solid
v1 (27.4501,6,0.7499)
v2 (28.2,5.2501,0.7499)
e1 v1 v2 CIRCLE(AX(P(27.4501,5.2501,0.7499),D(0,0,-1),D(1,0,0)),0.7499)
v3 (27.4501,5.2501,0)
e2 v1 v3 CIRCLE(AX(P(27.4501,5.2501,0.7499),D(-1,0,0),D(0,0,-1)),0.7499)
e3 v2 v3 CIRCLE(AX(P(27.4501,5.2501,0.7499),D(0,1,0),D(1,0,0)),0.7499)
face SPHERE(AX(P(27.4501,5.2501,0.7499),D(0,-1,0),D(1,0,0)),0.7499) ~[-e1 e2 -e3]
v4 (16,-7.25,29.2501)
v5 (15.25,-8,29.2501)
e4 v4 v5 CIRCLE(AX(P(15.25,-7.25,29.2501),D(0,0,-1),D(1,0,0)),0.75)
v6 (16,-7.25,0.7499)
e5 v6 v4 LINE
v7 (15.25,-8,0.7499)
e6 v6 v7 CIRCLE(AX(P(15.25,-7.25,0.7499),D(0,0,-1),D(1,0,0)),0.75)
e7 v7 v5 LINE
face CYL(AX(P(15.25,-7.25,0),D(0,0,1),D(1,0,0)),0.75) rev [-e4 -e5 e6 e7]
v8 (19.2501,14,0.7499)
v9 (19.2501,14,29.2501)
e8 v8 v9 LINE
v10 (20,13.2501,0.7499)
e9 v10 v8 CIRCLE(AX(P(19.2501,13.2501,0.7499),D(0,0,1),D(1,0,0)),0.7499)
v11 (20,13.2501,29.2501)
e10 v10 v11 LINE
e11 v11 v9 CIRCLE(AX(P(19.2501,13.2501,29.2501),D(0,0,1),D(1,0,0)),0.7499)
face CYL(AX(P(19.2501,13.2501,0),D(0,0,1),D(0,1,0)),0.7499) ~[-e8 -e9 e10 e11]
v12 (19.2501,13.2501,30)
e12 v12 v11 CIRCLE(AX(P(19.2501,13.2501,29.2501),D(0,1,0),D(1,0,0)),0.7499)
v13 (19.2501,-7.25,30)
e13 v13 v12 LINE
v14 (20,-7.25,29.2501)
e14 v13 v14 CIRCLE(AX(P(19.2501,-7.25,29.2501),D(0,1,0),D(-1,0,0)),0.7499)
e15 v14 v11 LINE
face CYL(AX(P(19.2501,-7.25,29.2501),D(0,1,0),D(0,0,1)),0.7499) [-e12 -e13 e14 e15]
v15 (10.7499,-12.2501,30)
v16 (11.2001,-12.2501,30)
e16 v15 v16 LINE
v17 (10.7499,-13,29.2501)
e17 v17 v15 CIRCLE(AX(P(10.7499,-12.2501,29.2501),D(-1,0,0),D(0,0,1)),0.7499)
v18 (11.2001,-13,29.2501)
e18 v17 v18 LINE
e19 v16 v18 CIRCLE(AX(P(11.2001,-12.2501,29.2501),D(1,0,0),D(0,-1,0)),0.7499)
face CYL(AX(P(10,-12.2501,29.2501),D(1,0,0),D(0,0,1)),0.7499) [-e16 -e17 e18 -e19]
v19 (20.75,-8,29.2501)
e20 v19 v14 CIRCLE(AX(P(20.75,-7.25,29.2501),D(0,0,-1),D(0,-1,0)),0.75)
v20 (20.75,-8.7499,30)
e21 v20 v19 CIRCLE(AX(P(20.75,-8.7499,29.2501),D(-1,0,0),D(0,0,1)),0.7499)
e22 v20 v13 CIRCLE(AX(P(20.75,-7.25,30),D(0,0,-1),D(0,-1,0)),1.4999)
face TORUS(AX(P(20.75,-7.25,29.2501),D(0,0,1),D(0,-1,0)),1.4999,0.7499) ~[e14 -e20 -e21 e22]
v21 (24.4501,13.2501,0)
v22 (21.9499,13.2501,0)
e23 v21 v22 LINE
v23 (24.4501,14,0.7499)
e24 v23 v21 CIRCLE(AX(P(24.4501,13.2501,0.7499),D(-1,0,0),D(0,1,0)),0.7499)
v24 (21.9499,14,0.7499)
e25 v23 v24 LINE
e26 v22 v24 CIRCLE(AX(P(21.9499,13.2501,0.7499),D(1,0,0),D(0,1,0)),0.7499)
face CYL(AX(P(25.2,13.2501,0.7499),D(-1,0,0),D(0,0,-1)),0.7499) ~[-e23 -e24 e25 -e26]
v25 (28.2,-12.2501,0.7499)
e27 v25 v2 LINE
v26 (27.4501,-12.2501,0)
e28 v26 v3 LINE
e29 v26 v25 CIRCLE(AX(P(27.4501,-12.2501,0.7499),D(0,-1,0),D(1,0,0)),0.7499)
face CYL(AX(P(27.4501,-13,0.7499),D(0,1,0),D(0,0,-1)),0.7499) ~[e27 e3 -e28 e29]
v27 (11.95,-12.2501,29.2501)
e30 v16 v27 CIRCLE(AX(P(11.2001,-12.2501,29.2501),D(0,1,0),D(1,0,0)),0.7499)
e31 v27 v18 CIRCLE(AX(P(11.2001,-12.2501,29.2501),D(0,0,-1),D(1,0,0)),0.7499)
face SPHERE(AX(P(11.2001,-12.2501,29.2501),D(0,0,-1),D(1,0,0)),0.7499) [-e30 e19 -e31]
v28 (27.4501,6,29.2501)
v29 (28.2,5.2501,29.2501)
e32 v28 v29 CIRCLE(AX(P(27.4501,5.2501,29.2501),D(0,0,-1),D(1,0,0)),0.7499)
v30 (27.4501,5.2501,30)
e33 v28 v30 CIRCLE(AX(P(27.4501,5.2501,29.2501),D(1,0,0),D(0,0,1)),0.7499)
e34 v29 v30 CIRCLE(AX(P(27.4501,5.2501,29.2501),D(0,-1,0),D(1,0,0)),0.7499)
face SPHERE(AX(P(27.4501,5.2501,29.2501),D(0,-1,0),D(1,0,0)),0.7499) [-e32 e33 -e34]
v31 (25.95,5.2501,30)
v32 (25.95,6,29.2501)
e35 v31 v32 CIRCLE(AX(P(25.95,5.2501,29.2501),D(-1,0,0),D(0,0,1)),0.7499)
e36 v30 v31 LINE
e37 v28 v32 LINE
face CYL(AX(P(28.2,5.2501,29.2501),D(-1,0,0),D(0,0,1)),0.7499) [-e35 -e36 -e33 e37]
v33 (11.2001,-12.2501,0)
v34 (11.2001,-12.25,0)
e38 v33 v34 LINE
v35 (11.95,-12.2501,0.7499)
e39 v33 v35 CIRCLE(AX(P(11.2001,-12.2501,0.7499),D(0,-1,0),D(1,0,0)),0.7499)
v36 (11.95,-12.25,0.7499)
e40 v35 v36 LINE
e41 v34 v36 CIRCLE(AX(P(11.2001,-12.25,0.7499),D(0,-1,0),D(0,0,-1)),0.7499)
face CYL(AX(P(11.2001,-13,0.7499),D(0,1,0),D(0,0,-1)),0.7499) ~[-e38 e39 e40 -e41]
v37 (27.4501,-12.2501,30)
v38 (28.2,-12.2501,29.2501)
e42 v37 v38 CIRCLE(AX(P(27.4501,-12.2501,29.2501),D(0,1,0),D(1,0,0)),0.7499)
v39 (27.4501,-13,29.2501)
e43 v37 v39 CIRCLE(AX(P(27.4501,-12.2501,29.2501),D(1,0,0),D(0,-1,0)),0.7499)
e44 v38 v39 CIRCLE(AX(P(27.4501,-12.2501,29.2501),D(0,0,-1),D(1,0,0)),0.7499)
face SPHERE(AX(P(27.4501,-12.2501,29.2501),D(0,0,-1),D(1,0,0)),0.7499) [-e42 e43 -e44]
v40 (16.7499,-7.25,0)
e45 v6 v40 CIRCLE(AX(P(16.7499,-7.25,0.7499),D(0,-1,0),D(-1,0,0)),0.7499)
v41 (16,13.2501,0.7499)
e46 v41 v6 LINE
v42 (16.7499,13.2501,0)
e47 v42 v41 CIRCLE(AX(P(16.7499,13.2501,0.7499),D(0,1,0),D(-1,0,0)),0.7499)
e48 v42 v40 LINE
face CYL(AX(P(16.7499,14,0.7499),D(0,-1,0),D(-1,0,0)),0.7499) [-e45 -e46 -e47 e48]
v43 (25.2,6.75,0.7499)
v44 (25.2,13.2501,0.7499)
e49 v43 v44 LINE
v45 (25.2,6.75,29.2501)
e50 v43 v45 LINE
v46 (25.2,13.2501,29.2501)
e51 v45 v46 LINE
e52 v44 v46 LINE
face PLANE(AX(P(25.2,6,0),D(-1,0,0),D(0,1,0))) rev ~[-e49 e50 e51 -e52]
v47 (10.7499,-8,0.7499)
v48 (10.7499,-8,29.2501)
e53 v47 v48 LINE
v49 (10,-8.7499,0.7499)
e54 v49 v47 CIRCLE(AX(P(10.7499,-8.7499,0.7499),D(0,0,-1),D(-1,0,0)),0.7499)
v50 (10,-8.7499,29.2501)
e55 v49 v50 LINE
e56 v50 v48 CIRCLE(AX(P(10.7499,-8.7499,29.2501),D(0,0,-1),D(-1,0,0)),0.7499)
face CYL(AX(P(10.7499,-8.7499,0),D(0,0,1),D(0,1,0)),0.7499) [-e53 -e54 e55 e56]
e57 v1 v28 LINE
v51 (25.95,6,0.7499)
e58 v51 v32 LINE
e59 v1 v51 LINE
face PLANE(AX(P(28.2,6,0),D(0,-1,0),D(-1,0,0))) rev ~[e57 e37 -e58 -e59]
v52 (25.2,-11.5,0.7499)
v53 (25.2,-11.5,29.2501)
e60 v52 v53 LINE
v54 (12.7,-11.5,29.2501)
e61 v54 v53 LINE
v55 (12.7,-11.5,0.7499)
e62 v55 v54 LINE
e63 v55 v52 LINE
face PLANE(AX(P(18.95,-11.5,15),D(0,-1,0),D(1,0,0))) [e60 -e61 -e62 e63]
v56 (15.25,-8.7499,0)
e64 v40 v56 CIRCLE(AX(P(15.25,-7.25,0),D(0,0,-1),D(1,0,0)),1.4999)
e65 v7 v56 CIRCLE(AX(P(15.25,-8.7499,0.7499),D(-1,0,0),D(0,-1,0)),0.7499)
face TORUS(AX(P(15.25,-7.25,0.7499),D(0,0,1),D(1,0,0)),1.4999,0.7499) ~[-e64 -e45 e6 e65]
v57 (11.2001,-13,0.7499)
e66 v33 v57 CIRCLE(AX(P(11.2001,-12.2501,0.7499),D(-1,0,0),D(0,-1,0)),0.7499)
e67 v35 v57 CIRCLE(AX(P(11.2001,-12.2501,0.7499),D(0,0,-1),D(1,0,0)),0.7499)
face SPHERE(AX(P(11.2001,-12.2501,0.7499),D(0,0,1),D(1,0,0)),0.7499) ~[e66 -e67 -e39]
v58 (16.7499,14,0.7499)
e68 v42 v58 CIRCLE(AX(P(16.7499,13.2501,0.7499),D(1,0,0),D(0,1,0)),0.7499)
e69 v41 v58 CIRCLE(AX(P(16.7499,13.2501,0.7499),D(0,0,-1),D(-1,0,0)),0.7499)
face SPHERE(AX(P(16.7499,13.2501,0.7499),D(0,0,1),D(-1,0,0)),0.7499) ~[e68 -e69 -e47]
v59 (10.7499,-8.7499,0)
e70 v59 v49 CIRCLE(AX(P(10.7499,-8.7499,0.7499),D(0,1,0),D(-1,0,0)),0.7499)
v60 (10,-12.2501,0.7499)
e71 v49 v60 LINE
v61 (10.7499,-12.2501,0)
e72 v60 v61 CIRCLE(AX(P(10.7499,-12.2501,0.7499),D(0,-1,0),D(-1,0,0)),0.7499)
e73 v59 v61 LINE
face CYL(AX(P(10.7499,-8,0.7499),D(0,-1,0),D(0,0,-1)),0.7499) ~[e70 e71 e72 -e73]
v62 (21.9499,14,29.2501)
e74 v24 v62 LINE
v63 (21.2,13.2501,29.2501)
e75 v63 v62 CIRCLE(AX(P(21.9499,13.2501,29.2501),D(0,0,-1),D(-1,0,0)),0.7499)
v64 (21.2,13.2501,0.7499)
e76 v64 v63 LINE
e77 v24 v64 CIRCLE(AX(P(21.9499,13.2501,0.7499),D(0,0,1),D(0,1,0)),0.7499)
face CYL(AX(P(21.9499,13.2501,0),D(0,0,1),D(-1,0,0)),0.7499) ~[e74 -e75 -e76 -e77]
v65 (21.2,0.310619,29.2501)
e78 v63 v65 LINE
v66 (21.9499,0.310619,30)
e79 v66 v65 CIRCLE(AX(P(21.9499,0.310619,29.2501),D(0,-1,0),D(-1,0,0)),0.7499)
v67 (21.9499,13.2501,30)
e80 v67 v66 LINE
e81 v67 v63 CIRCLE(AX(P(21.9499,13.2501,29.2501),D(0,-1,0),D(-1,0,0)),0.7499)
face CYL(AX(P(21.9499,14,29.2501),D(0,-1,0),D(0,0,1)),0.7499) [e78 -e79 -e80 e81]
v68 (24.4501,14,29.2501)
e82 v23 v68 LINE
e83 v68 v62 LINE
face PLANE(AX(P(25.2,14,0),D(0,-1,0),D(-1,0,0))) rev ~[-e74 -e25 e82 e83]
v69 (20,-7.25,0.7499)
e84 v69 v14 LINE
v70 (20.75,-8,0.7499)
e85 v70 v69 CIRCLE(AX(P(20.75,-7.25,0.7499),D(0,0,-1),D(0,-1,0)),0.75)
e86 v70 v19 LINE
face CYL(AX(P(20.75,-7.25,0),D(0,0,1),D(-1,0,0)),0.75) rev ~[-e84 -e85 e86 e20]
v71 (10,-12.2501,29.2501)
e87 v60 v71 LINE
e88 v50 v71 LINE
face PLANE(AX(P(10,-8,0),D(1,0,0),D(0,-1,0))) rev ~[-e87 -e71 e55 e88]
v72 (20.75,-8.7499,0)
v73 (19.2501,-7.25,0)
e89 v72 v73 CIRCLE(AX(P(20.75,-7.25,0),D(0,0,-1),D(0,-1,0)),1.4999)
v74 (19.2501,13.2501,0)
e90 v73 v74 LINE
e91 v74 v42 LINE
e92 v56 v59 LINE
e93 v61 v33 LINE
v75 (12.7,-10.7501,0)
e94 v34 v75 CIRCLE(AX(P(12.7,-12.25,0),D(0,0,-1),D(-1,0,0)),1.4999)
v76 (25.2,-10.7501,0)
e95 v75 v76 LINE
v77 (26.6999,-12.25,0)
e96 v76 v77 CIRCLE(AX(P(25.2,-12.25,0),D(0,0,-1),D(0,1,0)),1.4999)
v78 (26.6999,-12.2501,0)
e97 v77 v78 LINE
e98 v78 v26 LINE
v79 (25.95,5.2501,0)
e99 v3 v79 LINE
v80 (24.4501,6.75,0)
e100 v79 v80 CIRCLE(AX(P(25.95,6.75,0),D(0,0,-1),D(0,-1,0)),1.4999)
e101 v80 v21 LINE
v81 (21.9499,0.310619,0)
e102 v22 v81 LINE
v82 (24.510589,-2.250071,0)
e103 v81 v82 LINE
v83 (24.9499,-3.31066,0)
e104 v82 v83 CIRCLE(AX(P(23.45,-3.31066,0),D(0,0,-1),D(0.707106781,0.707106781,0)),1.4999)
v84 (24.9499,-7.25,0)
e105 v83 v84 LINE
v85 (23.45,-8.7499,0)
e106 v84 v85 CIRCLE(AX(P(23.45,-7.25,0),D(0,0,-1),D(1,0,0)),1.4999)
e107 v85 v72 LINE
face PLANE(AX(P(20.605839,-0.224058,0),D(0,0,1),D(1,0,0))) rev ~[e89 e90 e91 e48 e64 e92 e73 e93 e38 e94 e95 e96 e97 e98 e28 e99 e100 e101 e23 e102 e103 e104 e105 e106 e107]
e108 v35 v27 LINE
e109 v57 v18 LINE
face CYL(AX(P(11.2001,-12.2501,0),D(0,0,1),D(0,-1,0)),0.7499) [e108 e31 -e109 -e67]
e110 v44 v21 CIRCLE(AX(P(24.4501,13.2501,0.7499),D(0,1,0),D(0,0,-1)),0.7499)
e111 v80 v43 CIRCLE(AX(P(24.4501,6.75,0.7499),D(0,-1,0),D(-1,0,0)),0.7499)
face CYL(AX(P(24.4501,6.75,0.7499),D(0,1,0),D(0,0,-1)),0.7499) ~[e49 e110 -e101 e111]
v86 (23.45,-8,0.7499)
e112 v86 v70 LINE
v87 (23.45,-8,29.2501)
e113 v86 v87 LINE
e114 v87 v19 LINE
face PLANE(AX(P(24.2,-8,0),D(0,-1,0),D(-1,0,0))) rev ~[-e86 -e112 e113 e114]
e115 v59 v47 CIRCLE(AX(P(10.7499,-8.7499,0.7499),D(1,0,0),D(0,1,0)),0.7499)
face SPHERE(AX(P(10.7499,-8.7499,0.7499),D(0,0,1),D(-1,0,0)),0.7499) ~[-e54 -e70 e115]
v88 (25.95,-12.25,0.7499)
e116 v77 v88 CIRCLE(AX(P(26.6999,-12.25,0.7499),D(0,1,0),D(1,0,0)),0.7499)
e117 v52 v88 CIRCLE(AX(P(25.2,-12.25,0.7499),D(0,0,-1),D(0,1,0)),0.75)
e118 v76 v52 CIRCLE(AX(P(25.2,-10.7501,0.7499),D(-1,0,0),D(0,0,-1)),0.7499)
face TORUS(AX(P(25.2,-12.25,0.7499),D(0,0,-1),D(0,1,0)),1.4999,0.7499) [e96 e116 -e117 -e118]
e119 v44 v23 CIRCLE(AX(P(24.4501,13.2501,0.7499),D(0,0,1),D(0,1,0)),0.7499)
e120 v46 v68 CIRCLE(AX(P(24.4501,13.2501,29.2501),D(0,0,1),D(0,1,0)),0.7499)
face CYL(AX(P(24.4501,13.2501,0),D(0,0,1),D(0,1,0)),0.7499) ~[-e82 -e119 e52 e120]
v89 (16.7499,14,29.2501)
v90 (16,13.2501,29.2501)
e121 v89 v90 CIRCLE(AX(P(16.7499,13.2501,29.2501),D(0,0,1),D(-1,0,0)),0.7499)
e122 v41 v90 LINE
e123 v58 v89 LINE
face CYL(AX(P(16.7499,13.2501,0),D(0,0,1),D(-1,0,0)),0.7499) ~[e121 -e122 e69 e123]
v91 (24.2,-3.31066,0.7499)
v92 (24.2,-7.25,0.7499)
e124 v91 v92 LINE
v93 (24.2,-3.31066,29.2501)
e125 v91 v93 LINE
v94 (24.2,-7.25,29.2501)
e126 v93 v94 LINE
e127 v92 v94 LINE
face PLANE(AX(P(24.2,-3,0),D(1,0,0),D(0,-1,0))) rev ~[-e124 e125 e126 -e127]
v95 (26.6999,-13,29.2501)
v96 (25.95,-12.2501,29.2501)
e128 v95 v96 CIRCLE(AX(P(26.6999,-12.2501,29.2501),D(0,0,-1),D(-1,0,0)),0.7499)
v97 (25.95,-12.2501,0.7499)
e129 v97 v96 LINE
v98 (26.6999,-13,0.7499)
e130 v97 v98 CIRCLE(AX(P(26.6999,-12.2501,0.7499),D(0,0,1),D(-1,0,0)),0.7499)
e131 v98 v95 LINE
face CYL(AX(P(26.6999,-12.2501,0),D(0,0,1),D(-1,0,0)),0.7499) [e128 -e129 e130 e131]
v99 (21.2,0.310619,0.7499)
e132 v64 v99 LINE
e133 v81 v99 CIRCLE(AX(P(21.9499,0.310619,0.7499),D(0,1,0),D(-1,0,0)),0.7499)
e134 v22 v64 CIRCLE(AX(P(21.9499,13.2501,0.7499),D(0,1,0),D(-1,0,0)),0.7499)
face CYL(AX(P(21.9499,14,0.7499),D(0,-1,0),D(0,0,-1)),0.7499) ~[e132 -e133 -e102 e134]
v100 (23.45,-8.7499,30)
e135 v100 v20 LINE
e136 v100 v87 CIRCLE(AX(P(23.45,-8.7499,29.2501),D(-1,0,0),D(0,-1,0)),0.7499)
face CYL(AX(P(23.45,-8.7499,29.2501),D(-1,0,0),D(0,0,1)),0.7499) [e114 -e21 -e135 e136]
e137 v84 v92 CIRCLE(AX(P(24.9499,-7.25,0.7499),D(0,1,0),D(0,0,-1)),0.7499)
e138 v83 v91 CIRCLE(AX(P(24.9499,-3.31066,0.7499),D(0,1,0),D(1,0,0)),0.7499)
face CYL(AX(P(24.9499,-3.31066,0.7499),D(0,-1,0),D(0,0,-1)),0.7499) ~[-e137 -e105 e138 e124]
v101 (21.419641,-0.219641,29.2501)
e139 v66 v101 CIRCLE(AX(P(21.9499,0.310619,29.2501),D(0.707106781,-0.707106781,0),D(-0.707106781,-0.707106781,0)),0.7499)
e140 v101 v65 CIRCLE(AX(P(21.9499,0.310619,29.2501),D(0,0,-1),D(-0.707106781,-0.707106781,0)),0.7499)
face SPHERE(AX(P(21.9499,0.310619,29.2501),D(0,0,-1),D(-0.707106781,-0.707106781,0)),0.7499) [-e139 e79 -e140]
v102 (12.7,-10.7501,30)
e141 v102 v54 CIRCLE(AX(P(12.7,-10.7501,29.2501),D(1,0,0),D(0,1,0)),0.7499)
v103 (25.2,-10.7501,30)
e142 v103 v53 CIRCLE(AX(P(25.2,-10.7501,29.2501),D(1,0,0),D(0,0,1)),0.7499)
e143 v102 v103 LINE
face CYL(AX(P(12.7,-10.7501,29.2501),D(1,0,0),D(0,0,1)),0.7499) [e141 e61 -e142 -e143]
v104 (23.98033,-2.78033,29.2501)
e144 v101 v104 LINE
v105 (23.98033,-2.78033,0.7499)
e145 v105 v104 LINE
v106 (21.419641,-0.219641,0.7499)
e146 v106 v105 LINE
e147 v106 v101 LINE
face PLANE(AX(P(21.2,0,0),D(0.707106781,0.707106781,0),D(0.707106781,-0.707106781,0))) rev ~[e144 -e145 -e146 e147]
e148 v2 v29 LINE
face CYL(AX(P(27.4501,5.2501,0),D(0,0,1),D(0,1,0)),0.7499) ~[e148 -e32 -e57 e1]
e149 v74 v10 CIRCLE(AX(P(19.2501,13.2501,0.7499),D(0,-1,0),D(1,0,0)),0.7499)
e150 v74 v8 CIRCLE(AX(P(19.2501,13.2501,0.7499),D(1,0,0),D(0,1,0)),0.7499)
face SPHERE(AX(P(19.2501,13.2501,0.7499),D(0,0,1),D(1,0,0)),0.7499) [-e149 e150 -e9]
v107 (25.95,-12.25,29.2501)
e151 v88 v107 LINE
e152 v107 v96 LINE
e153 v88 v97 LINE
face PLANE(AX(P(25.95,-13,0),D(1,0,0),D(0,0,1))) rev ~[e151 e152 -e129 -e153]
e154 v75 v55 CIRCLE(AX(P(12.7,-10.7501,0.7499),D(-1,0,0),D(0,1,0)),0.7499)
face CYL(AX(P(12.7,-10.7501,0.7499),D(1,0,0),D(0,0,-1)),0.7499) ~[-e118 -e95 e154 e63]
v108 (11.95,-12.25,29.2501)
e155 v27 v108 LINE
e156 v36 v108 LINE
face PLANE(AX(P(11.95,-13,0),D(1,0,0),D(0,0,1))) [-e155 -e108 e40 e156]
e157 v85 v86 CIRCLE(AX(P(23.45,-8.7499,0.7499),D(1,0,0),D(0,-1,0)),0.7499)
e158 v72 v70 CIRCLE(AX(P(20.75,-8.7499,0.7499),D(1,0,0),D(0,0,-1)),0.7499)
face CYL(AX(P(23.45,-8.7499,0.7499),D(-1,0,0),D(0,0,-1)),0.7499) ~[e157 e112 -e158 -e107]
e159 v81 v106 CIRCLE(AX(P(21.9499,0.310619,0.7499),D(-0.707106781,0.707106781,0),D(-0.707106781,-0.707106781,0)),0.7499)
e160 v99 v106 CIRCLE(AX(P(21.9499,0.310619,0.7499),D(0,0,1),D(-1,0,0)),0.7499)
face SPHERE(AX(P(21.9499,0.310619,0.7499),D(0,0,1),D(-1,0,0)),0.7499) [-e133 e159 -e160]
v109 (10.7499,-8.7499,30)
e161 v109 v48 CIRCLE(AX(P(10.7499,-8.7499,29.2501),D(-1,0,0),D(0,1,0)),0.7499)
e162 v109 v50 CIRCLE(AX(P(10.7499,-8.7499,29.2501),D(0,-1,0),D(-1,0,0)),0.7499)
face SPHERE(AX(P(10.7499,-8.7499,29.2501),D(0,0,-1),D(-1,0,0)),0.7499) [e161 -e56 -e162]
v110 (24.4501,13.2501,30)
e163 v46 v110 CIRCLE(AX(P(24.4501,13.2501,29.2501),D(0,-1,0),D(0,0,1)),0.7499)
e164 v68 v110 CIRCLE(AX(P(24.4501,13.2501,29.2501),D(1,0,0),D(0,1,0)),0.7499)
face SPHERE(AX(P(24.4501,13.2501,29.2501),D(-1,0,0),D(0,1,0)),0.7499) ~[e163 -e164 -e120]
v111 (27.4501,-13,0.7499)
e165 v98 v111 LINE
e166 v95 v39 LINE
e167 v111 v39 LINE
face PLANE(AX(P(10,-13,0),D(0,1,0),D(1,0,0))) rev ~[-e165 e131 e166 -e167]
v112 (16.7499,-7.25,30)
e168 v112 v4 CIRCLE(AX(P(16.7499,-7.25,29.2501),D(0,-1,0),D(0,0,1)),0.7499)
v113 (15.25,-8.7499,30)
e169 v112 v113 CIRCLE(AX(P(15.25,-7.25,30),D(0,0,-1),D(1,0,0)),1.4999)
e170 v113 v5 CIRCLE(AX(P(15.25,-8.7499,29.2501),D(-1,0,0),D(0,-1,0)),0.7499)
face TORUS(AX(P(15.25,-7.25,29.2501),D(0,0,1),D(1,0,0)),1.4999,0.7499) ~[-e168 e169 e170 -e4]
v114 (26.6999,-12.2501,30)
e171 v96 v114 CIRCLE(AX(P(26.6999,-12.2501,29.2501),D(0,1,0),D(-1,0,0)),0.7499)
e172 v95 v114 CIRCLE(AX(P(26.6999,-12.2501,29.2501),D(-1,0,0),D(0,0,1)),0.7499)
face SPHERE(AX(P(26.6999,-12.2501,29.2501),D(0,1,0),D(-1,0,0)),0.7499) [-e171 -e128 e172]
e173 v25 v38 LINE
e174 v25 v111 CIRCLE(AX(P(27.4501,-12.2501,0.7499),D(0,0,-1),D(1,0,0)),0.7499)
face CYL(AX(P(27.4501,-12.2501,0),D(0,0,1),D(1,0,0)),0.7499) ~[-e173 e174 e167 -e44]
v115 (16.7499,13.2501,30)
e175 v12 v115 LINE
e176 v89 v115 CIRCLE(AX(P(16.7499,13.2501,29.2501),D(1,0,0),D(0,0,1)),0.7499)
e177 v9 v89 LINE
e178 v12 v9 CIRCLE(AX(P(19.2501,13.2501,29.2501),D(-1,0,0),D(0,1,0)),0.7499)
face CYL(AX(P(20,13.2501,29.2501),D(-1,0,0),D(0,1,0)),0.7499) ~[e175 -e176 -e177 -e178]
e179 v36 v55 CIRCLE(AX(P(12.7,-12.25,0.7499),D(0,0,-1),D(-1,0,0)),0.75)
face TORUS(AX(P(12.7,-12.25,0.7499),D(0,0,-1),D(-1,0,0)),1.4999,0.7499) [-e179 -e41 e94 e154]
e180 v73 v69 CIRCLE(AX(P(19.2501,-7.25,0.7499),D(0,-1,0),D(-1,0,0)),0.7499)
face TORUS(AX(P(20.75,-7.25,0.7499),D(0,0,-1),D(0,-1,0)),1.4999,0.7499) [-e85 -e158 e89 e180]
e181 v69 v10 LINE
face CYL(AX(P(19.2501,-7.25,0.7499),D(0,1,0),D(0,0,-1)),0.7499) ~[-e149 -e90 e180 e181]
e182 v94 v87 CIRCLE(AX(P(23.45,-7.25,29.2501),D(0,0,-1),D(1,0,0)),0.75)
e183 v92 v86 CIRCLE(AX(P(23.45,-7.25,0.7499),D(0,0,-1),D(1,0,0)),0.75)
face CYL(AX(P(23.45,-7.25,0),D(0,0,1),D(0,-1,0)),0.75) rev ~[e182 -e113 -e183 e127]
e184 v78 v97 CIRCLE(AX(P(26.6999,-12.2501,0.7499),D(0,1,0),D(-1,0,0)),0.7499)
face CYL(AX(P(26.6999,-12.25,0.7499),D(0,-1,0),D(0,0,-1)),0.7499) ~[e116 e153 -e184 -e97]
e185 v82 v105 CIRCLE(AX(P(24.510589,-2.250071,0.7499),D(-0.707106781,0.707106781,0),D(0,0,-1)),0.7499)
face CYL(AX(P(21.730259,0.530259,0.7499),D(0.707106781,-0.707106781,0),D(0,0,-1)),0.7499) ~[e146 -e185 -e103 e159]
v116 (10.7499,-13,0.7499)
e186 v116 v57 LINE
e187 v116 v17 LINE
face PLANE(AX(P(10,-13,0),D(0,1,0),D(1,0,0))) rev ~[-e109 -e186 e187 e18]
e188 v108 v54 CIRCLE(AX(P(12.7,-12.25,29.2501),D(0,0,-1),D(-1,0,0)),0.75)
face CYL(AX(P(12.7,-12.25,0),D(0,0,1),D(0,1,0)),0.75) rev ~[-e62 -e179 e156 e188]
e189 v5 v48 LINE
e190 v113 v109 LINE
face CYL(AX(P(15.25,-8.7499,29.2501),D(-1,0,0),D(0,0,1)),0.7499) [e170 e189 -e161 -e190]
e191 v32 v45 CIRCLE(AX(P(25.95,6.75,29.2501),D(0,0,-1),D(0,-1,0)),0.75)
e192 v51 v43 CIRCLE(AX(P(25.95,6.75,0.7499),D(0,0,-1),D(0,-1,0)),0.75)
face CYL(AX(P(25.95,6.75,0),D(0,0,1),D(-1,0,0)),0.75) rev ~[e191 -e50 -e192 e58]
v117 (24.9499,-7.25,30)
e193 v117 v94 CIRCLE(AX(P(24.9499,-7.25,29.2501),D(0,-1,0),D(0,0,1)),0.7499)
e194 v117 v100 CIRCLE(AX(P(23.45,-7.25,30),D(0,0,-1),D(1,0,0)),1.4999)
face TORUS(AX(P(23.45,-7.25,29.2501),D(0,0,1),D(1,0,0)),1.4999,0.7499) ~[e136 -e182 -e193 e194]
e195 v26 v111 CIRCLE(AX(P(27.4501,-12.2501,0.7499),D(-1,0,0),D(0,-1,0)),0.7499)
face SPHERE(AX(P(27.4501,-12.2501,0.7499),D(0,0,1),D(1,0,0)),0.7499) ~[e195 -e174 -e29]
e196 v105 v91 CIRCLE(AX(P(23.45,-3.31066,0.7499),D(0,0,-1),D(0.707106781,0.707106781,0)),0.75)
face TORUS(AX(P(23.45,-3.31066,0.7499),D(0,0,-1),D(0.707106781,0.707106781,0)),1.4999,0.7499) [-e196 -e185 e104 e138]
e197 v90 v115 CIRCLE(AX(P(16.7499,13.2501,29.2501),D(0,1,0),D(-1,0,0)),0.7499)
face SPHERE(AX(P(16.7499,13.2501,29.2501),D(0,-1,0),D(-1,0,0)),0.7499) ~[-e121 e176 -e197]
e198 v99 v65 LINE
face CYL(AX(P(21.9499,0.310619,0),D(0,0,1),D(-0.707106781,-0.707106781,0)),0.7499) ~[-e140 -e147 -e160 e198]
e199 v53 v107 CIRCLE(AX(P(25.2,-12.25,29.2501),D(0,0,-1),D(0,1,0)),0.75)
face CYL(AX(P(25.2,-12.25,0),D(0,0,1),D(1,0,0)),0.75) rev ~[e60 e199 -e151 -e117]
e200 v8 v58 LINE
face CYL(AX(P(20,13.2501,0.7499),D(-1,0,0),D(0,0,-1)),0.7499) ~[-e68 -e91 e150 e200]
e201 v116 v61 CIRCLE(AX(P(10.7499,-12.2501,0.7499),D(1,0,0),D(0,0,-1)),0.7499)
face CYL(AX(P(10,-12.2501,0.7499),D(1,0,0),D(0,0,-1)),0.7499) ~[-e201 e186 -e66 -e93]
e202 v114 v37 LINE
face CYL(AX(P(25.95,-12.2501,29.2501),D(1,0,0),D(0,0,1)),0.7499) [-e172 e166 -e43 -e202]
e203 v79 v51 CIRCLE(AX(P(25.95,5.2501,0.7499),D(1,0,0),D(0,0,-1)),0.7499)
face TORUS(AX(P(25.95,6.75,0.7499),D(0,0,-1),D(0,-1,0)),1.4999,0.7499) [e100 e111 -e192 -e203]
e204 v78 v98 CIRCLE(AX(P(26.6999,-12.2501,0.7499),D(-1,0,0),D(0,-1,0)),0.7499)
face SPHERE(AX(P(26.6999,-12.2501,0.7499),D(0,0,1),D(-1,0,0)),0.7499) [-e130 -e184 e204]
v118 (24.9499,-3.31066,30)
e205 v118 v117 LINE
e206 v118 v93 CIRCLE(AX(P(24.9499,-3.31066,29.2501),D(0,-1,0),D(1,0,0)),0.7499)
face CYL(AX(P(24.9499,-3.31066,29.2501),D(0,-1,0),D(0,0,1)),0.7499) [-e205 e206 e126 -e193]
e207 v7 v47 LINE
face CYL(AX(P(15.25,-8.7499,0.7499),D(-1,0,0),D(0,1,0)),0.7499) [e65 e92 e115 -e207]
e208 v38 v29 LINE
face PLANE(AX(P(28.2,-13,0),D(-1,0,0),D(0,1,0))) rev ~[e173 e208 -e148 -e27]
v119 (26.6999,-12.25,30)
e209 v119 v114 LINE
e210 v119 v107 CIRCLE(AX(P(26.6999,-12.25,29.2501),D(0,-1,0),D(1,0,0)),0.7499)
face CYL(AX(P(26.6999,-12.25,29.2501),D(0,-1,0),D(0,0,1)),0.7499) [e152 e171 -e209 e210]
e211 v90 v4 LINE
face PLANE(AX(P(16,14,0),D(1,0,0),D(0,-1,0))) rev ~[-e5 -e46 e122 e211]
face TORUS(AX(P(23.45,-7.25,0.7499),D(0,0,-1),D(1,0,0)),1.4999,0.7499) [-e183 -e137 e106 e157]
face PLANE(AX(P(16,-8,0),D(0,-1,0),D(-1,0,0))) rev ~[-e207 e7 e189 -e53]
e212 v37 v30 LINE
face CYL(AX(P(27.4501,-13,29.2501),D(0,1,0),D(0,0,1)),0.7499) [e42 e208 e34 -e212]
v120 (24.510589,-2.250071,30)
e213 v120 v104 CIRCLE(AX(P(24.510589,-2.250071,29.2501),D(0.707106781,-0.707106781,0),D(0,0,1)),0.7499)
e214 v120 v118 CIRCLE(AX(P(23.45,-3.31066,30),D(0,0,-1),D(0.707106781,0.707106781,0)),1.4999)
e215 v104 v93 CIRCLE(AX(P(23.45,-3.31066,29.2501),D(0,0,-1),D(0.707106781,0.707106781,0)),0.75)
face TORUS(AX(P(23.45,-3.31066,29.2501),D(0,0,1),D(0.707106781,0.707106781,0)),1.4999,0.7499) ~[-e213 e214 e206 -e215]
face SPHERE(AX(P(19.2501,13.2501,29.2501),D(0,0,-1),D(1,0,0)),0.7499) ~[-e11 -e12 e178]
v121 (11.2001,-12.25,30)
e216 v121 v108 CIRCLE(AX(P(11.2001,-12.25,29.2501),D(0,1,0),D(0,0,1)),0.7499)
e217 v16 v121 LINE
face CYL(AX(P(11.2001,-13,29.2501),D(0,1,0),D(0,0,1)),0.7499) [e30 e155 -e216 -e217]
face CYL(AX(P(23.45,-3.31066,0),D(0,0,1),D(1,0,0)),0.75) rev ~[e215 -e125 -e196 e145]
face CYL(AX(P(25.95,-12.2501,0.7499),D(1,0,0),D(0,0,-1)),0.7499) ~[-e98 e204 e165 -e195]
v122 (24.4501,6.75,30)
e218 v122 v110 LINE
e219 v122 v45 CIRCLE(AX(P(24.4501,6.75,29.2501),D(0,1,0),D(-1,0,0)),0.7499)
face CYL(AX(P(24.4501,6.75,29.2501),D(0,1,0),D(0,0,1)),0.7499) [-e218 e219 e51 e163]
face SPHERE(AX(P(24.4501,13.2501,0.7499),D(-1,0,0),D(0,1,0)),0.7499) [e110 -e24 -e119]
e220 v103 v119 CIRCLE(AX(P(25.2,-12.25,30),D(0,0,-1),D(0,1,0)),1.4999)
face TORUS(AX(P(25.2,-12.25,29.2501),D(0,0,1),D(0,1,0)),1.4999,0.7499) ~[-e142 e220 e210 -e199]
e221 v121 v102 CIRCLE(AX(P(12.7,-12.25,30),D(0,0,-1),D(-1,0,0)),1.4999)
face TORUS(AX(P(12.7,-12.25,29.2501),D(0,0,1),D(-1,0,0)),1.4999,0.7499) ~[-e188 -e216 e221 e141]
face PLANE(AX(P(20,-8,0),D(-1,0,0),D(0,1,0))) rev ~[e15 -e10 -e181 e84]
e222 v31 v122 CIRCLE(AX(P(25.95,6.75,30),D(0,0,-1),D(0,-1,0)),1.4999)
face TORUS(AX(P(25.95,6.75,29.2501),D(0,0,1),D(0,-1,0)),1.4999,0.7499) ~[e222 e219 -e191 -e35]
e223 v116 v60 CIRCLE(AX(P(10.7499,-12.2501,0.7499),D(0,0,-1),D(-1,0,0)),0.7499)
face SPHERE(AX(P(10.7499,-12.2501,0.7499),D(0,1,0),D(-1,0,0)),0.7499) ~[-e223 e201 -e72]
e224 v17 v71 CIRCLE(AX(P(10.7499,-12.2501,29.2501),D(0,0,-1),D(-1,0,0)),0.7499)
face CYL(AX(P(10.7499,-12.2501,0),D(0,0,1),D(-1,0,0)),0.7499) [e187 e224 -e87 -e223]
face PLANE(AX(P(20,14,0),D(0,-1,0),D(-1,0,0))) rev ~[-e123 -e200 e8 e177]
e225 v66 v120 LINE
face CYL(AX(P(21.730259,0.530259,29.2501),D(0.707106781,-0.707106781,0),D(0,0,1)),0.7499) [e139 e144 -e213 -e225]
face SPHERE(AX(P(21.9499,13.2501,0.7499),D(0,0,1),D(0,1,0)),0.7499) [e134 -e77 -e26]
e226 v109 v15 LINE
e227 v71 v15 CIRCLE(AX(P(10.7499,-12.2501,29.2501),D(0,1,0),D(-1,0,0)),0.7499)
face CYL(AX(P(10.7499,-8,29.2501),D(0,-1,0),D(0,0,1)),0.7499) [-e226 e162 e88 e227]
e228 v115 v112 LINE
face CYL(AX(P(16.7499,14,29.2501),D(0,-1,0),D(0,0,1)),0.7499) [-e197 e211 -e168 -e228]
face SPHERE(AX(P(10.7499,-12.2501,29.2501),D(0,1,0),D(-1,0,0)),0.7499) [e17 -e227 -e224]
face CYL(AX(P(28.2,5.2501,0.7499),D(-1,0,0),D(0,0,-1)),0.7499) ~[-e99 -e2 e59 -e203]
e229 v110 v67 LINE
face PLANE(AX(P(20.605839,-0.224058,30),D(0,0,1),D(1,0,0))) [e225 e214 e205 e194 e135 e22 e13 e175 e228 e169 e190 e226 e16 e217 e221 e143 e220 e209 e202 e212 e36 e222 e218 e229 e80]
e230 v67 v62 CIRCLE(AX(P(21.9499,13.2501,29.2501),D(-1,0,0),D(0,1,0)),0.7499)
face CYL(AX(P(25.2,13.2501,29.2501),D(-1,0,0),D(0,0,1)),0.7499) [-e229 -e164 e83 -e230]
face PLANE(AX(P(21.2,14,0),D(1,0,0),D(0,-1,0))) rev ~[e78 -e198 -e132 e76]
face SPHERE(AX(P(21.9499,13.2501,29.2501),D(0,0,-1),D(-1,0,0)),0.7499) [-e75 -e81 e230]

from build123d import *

# Parameters (mm, degrees)
F1_DEPTH = 30
F2_W     = 14
F2_H     = 30
F3_DEPTH = 1.5
F4_F1_R  = 0.75
F4_F2_R  = 0.7499


# Not quite as in the source:
# - a fillet or chamfer is up to 0.001 mm smaller than in the source, because OpenCascade refuses the exact size


with BuildPart() as f1:
    # F0 (on Top) → F1 (new body)
    with BuildSketch(Plane.XY):
        Polygon((16, 14), (16, -8), (10, -8), (10, -13), (28.2, -13), (28.2, 6), (25.2, 6), (25.2, 14), (21.2, 14), (21.2, 0), (24.2, -3), (24.2, -8), (20, -8), (20, 14), align=None)
    extrude(amount=F1_DEPTH)

    # F2 (on face) → F3 (cut)
    with BuildSketch(Plane.XZ.offset(13)):
        with Locations((18.95, 15)):
            Rectangle(F2_W, F2_H)
    extrude(amount=-F3_DEPTH, mode=Mode.SUBTRACT)

    # F4: fillet of radius 0.75 on 50 edges, made by hand

    # F4_f1
    f4_f1_edges = [f1.edges().sort_by_distance(p)[0] for p in [
        (16, -8, 15),
        (24.2, -8, 15),
        (20, -8, 15),
        (25.95, -11.5, 15),
        (11.95, -11.5, 15),
        (25.2, 6, 15),
        (24.2, -3, 15),
    ]]
    fillet(f4_f1_edges, radius=F4_F1_R)

    # F4_f2 (radius 0.75 in the source; OpenCascade refuses exactly that, so slightly less here)
    f4_f2_edges = [f1.edges().sort_by_distance(p)[0] for p in [
        (21.2, 14, 15),
        (10, -8, 15),
        (10, -10.5, 30),
        (10, -10.5, 0),
        (12.625, -8, 30),
        (16, 3.375, 30),
        (16, 14, 15),
        (16, 3.375, 0),
        (23.2, 14, 0),
        (20, 14, 15),
        (20, 3.375, 30),
        (21.2, 7, 30),
        (22.1, -8, 30),
        (21.2, 7, 0),
        (20, 3.375, 0),
        (23.2, 14, 30),
        (18, 14, 30),
        (18, 14, 0),
        (10, -13, 15),
        (11.95, -13, 15),
        (18.95, -11.5, 30),
        (28.2, -13, 15),
        (28.2, -3.5, 30),
        (25.95, -13, 15),
        (18.95, -11.5, 0),
        (28.2, -3.5, 0),
        (25.95, -12.625, 0),
        (25.95, -12.625, 30),
        (11.95, -12.625, 30),
        (11.95, -12.625, 0),
        (10.975, -13, 0),
        (10.975, -13, 30),
        (27.075, -13, 30),
        (27.075, -13, 0),
        (28.2, 6, 15),
        (25.2, 14, 15),
        (25.2, 10.375, 30),
        (27.075, 6, 30),
        (27.075, 6, 0),
        (25.2, 10.375, 0),
        (21.2, 0, 15),
        (22.5901650429, -1.3901650429, 0),
        (22.5901650429, -1.3901650429, 30),
        (24.1429096494, -3.0236475975, 30),
        (24.1429096494, -3.0236475975, 0),
        (25.4196699141, 6.2196699141, 0),
        (25.4196699141, 6.2196699141, 30),
        (12.1696699141, -11.7196699141, 0),
        (12.1696699141, -11.7196699141, 30),
        (25.7303300859, -11.7196699141, 30),
        (25.7303300859, -11.7196699141, 0),
        (20.2196699141, -7.7803300859, 0),
        (23.9803300859, -7.7803300859, 30),
        (20.2196699141, -7.7803300859, 30),
        (15.7803300859, -7.7803300859, 0),
        (15.7803300859, -7.7803300859, 30),
    ]]
    fillet(f4_f2_edges, radius=F4_F2_R)


solid = f1.part
